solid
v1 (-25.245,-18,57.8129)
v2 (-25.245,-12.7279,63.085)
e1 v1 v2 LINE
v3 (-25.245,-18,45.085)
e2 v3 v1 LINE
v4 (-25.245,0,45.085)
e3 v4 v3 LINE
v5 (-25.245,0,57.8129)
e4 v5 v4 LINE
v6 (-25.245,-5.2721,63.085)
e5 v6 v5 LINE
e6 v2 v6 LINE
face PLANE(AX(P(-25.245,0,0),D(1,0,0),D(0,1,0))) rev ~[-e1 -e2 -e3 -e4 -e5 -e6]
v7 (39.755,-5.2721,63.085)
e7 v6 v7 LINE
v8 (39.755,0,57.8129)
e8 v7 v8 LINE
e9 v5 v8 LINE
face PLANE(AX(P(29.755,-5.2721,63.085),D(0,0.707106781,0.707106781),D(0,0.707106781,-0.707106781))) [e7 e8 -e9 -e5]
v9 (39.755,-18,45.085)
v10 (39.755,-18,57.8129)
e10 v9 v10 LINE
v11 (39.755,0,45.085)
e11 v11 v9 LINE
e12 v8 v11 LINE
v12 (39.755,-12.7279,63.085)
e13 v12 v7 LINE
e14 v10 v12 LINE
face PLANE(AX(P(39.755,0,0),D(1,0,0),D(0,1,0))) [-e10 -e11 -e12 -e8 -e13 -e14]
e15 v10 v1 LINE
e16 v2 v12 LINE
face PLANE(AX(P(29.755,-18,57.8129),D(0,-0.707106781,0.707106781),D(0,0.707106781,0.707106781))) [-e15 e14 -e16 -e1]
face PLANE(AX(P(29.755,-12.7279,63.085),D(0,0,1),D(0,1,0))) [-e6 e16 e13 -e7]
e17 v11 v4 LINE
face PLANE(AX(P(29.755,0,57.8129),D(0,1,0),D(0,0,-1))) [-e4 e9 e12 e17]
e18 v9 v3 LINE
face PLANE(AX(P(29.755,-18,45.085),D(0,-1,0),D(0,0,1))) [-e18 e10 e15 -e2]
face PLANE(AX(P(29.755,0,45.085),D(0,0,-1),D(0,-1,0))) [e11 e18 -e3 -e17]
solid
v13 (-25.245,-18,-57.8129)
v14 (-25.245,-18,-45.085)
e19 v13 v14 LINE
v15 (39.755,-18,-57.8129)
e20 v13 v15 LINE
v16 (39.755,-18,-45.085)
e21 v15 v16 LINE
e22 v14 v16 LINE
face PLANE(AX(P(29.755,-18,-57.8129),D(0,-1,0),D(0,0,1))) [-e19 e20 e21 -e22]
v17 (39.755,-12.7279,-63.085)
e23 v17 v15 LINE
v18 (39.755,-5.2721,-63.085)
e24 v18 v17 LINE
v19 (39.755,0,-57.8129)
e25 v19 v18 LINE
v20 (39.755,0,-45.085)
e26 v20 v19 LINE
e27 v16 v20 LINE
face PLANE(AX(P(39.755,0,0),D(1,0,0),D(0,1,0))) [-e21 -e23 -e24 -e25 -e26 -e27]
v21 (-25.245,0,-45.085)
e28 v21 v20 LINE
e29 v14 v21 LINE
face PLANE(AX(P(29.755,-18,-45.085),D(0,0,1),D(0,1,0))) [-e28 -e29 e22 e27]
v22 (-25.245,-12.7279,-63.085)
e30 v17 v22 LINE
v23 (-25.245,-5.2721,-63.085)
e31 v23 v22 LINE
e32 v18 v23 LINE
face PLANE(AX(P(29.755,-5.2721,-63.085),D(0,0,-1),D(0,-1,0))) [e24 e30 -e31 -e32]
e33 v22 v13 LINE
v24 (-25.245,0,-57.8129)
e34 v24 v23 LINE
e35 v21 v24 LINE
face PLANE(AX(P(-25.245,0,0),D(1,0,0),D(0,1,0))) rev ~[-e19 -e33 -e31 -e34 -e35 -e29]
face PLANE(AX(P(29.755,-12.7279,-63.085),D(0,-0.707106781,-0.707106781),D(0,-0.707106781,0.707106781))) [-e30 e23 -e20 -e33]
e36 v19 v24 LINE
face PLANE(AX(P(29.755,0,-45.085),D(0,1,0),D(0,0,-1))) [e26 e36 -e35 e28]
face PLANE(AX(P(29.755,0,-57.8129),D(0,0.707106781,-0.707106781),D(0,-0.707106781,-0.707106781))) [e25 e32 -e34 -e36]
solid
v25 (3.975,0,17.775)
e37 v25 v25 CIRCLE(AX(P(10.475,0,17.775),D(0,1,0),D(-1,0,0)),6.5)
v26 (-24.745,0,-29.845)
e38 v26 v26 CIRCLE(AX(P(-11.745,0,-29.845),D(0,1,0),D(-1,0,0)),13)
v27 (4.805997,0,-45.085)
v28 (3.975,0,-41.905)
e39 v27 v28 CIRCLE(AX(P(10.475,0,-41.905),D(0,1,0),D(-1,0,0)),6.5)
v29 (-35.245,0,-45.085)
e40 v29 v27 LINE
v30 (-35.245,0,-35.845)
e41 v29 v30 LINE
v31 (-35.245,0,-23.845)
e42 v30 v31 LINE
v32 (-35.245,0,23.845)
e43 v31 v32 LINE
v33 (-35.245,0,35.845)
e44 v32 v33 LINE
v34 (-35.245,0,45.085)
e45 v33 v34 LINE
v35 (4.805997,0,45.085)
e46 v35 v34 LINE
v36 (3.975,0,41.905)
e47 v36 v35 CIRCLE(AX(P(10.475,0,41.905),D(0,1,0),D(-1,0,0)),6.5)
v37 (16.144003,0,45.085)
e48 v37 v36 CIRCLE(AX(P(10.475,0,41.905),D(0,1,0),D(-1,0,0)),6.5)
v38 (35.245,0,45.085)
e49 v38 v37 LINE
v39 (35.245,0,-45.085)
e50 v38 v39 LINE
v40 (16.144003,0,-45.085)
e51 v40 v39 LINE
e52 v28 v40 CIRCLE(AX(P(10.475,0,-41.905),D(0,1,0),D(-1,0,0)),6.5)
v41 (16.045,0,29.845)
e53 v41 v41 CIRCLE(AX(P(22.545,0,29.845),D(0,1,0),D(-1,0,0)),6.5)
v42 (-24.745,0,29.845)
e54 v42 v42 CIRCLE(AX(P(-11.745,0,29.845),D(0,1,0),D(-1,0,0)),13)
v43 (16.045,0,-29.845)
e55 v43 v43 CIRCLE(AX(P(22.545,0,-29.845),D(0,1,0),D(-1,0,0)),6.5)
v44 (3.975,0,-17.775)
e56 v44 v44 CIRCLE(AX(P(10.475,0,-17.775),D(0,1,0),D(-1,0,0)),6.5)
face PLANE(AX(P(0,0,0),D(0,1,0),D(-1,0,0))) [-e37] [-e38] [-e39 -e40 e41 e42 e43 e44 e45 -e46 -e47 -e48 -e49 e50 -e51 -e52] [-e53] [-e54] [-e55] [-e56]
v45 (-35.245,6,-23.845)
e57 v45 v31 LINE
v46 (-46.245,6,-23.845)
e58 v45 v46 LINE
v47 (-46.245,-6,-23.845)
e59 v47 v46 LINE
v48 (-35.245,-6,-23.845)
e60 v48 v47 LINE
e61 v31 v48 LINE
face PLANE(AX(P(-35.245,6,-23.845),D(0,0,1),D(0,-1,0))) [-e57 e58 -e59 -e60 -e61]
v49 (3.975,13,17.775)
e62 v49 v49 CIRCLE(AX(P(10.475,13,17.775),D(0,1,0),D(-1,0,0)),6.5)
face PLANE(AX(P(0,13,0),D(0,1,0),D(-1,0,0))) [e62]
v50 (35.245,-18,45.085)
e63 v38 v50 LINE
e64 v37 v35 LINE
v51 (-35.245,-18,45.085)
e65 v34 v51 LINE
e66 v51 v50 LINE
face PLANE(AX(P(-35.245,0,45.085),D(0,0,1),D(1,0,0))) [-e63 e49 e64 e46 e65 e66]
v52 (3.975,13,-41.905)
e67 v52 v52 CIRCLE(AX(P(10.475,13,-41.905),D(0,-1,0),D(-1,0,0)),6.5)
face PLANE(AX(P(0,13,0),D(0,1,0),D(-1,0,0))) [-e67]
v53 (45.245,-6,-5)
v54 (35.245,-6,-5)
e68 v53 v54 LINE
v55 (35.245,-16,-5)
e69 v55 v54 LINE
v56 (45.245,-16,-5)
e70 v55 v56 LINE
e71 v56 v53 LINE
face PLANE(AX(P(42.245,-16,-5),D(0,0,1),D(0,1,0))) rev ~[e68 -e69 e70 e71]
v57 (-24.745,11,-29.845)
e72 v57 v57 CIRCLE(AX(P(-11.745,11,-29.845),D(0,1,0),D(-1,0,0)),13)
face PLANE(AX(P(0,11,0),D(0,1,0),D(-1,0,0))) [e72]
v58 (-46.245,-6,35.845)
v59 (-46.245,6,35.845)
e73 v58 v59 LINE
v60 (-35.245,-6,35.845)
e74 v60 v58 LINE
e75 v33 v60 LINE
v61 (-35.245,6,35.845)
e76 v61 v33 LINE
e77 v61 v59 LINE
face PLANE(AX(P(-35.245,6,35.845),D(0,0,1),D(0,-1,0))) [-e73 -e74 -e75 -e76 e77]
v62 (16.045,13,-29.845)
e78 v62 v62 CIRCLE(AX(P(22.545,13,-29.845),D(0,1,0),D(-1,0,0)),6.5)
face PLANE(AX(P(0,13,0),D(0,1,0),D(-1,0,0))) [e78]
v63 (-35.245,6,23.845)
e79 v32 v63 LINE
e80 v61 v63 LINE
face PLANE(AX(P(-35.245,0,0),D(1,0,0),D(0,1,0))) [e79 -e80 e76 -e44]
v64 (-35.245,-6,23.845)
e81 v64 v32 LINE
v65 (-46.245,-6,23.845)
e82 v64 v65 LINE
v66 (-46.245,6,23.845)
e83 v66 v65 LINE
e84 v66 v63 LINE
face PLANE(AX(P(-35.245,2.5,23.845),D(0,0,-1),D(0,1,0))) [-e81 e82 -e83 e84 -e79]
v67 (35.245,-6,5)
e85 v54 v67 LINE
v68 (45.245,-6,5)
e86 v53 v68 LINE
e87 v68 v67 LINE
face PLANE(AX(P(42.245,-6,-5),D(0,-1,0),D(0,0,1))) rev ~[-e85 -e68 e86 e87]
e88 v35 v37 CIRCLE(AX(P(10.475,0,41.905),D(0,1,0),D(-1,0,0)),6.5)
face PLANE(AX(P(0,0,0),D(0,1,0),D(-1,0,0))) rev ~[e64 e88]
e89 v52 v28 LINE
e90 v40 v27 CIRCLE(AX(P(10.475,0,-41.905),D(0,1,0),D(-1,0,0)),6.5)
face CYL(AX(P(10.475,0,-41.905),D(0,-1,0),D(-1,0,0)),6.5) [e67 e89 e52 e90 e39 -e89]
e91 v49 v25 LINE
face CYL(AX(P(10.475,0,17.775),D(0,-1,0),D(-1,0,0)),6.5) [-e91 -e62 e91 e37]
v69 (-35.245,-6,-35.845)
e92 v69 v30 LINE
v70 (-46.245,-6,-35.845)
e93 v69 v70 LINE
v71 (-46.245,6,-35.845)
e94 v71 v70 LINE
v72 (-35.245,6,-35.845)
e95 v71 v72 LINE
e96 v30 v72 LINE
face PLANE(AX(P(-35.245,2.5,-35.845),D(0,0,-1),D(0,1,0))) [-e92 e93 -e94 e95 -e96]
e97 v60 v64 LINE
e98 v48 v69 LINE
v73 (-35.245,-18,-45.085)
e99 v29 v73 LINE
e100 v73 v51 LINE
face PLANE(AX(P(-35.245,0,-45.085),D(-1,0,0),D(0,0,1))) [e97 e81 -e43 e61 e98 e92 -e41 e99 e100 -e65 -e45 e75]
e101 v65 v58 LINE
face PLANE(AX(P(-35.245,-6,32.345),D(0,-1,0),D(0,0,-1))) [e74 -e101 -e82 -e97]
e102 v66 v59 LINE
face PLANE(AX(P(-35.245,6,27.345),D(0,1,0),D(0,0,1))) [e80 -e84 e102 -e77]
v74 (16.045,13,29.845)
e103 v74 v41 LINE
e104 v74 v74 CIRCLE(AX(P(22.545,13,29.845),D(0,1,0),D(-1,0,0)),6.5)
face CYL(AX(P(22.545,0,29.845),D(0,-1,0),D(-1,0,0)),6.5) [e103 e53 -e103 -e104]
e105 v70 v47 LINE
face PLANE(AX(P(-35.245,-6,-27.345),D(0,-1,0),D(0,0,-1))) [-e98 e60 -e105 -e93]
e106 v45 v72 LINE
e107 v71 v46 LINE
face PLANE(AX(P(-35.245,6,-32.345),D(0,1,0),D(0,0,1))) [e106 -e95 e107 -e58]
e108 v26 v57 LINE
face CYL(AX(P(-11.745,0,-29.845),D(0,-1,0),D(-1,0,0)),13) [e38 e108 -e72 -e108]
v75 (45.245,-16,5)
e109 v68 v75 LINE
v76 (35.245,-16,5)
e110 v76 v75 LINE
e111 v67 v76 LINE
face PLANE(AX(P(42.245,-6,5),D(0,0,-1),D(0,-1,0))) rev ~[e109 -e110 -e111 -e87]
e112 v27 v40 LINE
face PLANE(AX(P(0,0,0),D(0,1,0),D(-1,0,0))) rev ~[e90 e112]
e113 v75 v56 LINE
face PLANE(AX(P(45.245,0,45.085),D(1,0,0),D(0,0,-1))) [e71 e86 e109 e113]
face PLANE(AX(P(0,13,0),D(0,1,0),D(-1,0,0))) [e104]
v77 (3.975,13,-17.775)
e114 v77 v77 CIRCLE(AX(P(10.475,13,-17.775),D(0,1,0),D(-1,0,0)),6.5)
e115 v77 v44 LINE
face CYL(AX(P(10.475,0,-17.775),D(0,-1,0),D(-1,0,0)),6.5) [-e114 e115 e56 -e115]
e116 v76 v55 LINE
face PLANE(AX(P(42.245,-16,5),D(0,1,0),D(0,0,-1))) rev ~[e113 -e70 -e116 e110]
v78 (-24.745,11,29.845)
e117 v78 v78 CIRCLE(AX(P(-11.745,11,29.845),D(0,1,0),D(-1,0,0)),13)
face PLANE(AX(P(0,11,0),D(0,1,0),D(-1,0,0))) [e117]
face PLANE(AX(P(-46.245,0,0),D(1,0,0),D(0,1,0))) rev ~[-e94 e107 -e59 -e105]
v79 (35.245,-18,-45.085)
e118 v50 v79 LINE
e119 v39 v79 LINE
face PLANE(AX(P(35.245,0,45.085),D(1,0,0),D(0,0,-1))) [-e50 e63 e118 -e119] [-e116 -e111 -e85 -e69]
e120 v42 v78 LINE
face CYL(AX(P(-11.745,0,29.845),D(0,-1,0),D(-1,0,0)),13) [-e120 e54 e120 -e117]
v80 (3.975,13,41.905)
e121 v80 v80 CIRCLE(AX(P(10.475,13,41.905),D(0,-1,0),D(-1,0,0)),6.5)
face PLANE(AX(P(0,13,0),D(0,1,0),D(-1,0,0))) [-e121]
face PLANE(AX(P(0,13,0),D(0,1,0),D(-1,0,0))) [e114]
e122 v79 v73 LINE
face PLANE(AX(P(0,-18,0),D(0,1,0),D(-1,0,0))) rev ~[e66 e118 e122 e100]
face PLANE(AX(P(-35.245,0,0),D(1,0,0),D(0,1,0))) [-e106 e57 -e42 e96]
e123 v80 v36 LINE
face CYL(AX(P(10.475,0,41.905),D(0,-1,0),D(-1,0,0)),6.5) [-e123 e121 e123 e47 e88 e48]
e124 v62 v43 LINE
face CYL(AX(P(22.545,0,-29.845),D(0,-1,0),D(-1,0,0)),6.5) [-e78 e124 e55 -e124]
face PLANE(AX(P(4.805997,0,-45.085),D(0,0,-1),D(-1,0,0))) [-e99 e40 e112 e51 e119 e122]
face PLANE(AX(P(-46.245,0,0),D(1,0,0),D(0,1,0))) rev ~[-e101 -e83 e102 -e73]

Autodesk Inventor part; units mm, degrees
ref_plane "XY Plane" through (0, 0, 0) normal (0, 0, 1) x (1, 0, 0)
sketch "Sketch1" plane through (0, 0, 0) normal (0, 1, 0) x (-1, 0, 0)
  line L0 (35.245, 45.085) -> (-35.245, 45.085)
  line L1 (-35.245, 45.085) -> (-35.245, -45.085)
  line L2 (-35.245, -45.085) -> (35.245, -45.085)
  line L3 (35.245, -45.085) -> (35.245, 45.085)
  circle A0 centre (11.745, 29.845) radius 13
  circle A1 centre (11.745, -29.845) radius 13
  line L4 (-10.475, 45.085) -> (-10.475, -45.085) construction
  circle A2 centre (-10.475, 41.905) radius 6.5
  circle A3 centre (-10.475, 17.775) radius 6.5
  circle A4 centre (-10.475, -17.775) radius 6.5
  circle A5 centre (-10.475, -41.905) radius 6.5
  circle A6 centre (-22.545, 29.845) radius 6.5
  circle A7 centre (-22.545, -29.845) radius 6.5
  point P0 (0, 0)
  dimension "d0" = 90.17
  dimension "d1" = 45.085
  dimension "d2" = 35.245
  dimension "d3" = 70.49
  dimension "d4" = 15.24
  dimension "d5" = 15.24
  dimension "d6" = 23.5
  dimension "d7" = 23.5
  dimension "d8" = 26
  dimension "d9" = 26
  dimension "d10" = 45.72
  dimension "d11" = 13
  dimension "d12" = 13
  dimension "d13" = 13
  dimension "d14" = 13
  dimension "d15" = 3.18
  dimension "d16" = 3.18
  dimension "d17" = 24.13
  dimension "d18" = 24.13
  dimension "d19" = 13
  dimension "d20" = 12.07
  dimension "d21" = 12.07
  dimension "d22" = 0
  dimension "d23" = 0
  dimension "d24" = 13
extrude "Extrusion1" add sketch "Sketch1" along normal blind 11 contours A0 | A1
sketch "Sketch2" plane through (0, 0, 0) normal (0, 1, 0) x (-1, 0, 0)
  line L0 (35.245, 45.085) -> (-35.245, 45.085)
  line L1 (-35.245, 45.085) -> (-35.245, -45.085)
  line L2 (-35.245, -45.085) -> (35.245, -45.085)
  line L3 (35.245, -45.085) -> (35.245, 45.085)
  circle A0 centre (11.745, 29.845) radius 13
  circle A1 centre (11.745, -29.845) radius 13
  line L4 (-10.475, 45.085) -> (-10.475, -45.085) construction
  circle A2 centre (-10.475, 41.905) radius 6.5
  circle A3 centre (-10.475, 17.775) radius 6.5
  circle A4 centre (-10.475, -17.775) radius 6.5
  circle A5 centre (-10.475, -41.905) radius 6.5
  circle A6 centre (-22.545, 29.845) radius 6.5
  circle A7 centre (-22.545, -29.845) radius 6.5
  point P0 (0, 0)
  dimension "d27" = 90.17
  dimension "d28" = 45.085
  dimension "d29" = 35.245
  dimension "d30" = 70.49
  dimension "d31" = 15.24
  dimension "d32" = 15.24
  dimension "d33" = 23.5
  dimension "d34" = 23.5
  dimension "d35" = 26
  dimension "d36" = 26
  dimension "d37" = 45.72
  dimension "d38" = 13
  dimension "d39" = 13
  dimension "d40" = 13
  dimension "d41" = 13
  dimension "d42" = 3.18
  dimension "d43" = 3.18
  dimension "d44" = 24.13
  dimension "d45" = 24.13
  dimension "d46" = 13
  dimension "d47" = 12.07
  dimension "d48" = 12.07
  dimension "d49" = 0
  dimension "d50" = 0
  dimension "d51" = 13
extrude "Extrusion2" add sketch "Sketch2" along normal blind 7 contours A2 L0 | L0 A2 | A5 L2 | L2 A5 | A3 | A4 | A6 | A7
ref_plane "Work Plane1" through (0, 7, 0) normal (0, 1, 0) x (-1, 0, 0)
sketch "Sketch3" plane through (0, 7, 0) normal (0, 1, 0) x (-1, 0, 0)
  line L0 (35.245, 45.085) -> (-35.245, 45.085)
  line L1 (-35.245, 45.085) -> (-35.245, -45.085)
  line L2 (-35.245, -45.085) -> (35.245, -45.085)
  line L3 (35.245, -45.085) -> (35.245, 45.085)
  circle A0 centre (11.745, 29.845) radius 13
  circle A1 centre (11.745, -29.845) radius 13
  line L4 (-10.475, 45.085) -> (-10.475, -45.085) construction
  circle A2 centre (-10.475, 41.905) radius 6.5
  circle A3 centre (-10.475, 17.775) radius 6.5
  circle A4 centre (-10.475, -17.775) radius 6.5
  circle A5 centre (-10.475, -41.905) radius 6.5
  circle A6 centre (-22.545, 29.845) radius 6.5
  circle A7 centre (-22.545, -29.845) radius 6.5
  point P0 (0, 0)
  dimension "d55" = 90.17
  dimension "d56" = 45.085
  dimension "d57" = 35.245
  dimension "d58" = 70.49
  dimension "d59" = 15.24
  dimension "d60" = 15.24
  dimension "d61" = 23.5
  dimension "d62" = 23.5
  dimension "d63" = 26
  dimension "d64" = 26
  dimension "d65" = 45.72
  dimension "d66" = 13
  dimension "d67" = 13
  dimension "d68" = 13
  dimension "d69" = 13
  dimension "d70" = 3.18
  dimension "d71" = 3.18
  dimension "d72" = 24.13
  dimension "d73" = 24.13
  dimension "d74" = 13
  dimension "d75" = 12.07
  dimension "d76" = 12.07
  dimension "d77" = 0
  dimension "d78" = 0
  dimension "d79" = 13
extrude "Extrusion3" add sketch "Sketch3" along normal blind 6 contours A2 L0 | L0 A2 | A5 L2 | L2 A5 | A3 | A4 | A6 | A7
sketch "Sketch4" plane through (0, 0, 0) normal (0, 1, 0) x (-1, 0, 0)
  line L0 (35.245, 45.085) -> (-35.245, 45.085)
  line L1 (-35.245, 45.085) -> (-35.245, -45.085)
  line L2 (-35.245, -45.085) -> (35.245, -45.085)
  line L3 (35.245, -45.085) -> (35.245, 45.085)
  circle A0 centre (11.745, 29.845) radius 13
  circle A1 centre (11.745, -29.845) radius 13
  line L4 (-10.475, 45.085) -> (-10.475, -45.085) construction
  circle A2 centre (-10.475, 41.905) radius 6.5
  circle A3 centre (-10.475, 17.775) radius 6.5
  circle A4 centre (-10.475, -17.775) radius 6.5
  circle A5 centre (-10.475, -41.905) radius 6.5
  circle A6 centre (-22.545, 29.845) radius 6.5
  circle A7 centre (-22.545, -29.845) radius 6.5
  point P0 (0, 0)
  dimension "d82" = 90.17
  dimension "d83" = 45.085
  dimension "d84" = 35.245
  dimension "d85" = 70.49
  dimension "d86" = 15.24
  dimension "d87" = 15.24
  dimension "d88" = 23.5
  dimension "d89" = 23.5
  dimension "d90" = 26
  dimension "d91" = 26
  dimension "d92" = 45.72
  dimension "d93" = 13
  dimension "d94" = 13
  dimension "d95" = 13
  dimension "d96" = 13
  dimension "d97" = 3.18
  dimension "d98" = 3.18
  dimension "d99" = 24.13
  dimension "d100" = 24.13
  dimension "d101" = 13
  dimension "d102" = 12.07
  dimension "d103" = 12.07
  dimension "d104" = 0
  dimension "d105" = 0
  dimension "d106" = 13
extrude "Extrusion4" add sketch "Sketch4" against normal blind 18 contours L3 L2 A5 L1 L0 A2 | A2 L0 | L2 A5 | A0 | A1 | A3 | A4 | A6 | A7 picked at (-10.0855, 41.5356) picked at (-10.2378, -41.8714)
ref_plane "Work Plane2" through (-35.245, 0, 0) normal (1, 0, 0) x (0, 1, 0)
sketch "Sketch6" plane through (-35.245, 0, 0) normal (1, 0, 0) x (0, 1, 0)
  circle A0 centre (0, -29.845) radius 6.5
  circle A1 centre (0, 29.845) radius 6.5
  line L0 (0, -45.085) -> (0, 45.085) projected
  line L1 (6, -23.845) -> (-6, -23.845)
  line L2 (-6, -23.845) -> (-6, -35.845)
  line L3 (-6, -35.845) -> (6, -35.845)
  line L4 (6, -35.845) -> (6, -23.845)
  line L5 (6, 35.845) -> (-6, 35.845)
  line L6 (-6, 35.845) -> (-6, 23.845)
  line L7 (-6, 23.845) -> (6, 23.845)
  line L8 (6, 23.845) -> (6, 35.845)
  point P0 (0, 0)
  dimension "d114" = 13
  dimension "d115" = 13
  dimension "d116" = 59.69
  dimension "d117" = 29.845
  dimension "d149" = 12
  dimension "d150" = 12
  dimension "d151" = 6
  dimension "d152" = 6
  dimension "d153" = 12
  dimension "d154" = 12
  dimension "d155" = 6
  dimension "d156" = 6
extrude "Extrusion5" add sketch "Sketch6" against normal blind 7 contours L4 A0 L3 L0 L1 | A0 L1 L4 | L4 L3 A0 | L0 L3 A0 L2 L1 | A0 L2 L1 | L3 L2 A0 | L8 A1 L7 L0 L5 | A1 L5 L8 | L8 L7 A1 | L0 L7 A1 L6 L5 | A1 L6 L5 | L7 L6 A1
ref_plane "Work Plane3" through (-42.245, 0, 0) normal (1, 0, 0) x (0, 1, 0)
sketch "Sketch8" plane through (-35.245, 0, 0) normal (1, 0, 0) x (0, 1, 0)
  circle A0 centre (-9, 54.085) radius 9
  circle A1 centre (-9, -54.085) radius 9
  line L0 (0, 45.085) -> (-18, 45.085) projected
  line L1 (0, -45.085) -> (-18, -45.085) projected
  line L2 (0, 63.085) -> (-18, 63.085)
  line L3 (-18, 63.085) -> (-18, 45.085)
  line L4 (-18, 45.085) -> (0, 45.085)
  line L5 (0, 45.085) -> (0, 63.085)
  line L6 (-5.2721, 63.085) -> (0, 57.8129)
  line L7 (-12.7279, 63.085) -> (-18, 57.8129)
  line L8 (0, -48.405) -> (0, -45.085) projected
  line L9 (-18, -63.085) -> (0, -63.085)
  line L10 (0, -63.085) -> (0, -45.085)
  line L11 (0, -45.085) -> (-18, -45.085)
  line L12 (-18, -45.085) -> (-18, -63.085)
  line L13 (-5.2721, -63.085) -> (0, -57.8129)
  line L14 (-12.7279, -63.085) -> (-18, -57.8129)
  point P0 (0, 0)
  point P1 (-18, 54.085)
  point P2 (-9, 45.085)
  point P3 (-2.636, 60.449)
  point P4 (-9, 63.085)
  point P5 (0, 54.085)
  point P6 (-15.364, 60.449)
  point P7 (-15.364, -60.449)
  point P8 (-18, -54.085)
  point P9 (-2.636, -60.449)
  point P10 (0, -54.085)
  point P11 (-9, -63.085)
  point P12 (-9, -45.085)
  dimension "d127" = 18
  dimension "d128" = 18
  dimension "d129" = 9
  dimension "d130" = 9
  dimension "d1540" = 45
  dimension "d1541" = 45
  dimension "d1542" = 45
  dimension "d1543" = 45
extrude "Extrusion7" add sketch "Sketch8" along normal blind 65 separate body contours A0 | L5 L0 A0 | A0 L6 L5 | A0 L2 L6 | L0 L3 A0 | A0 L7 L2 | L3 L7 A0 | A1 | L10 L13 A1 | A1 L1 L8 L10 | A1 L12 L1 | L13 L9 A1 | A1 L14 L12 | L9 L14 A1
sketch "Sketch9" plane through (0, 7, 0) normal (0, 1, 0) x (-1, 0, 0)
  line L0 (25.245, 13.5) -> (-1.755, 13.5)
  line L1 (-1.755, 13.5) -> (-1.755, -13.5)
  line L2 (-1.755, -13.5) -> (25.245, -13.5)
  line L3 (25.245, -13.5) -> (25.245, 13.5)
  circle A0 centre (11.745, 29.845) radius 13 projected
  circle A1 centre (11.745, 29.845) radius 13
  point P0 (0, 0)
  dimension "d133" = 27
  dimension "d134" = 27
  dimension "d135" = 13.5
  dimension "d136" = 13.5
sketch "Sketch10" plane through (35.245, 0, 45.085) normal (1, 0, 0) x (0, 0, -1)
  line L0 (40.085, -16) -> (50.085, -16)
  line L1 (50.085, -16) -> (50.085, -6)
  line L2 (50.085, -6) -> (40.085, -6)
  line L3 (40.085, -6) -> (40.085, -16)
  line L4 (0, 0) -> (90.17, 0) projected
  point P0 (45.085, 0)
  dimension "d137" = 10
  dimension "d138" = 10
  dimension "d140" = 5
  dimension "d171" = 6
extrude "Extrusion8" add sketch "Sketch10" along normal blind 7 bodies 1
sketch "Sketch11" plane through (42.245, 0, 45.085) normal (1, 0, 0) x (0, 0, -1)
  line L0 (40.085, -16) -> (50.085, -16)
  line L1 (50.085, -16) -> (50.085, -6)
  line L2 (50.085, -6) -> (40.085, -6)
  line L3 (40.085, -6) -> (40.085, -16)
  line L4 (0, 0) -> (90.17, 0) projected
  point P0 (45.085, 0)
  dimension "d143" = 10
  dimension "d144" = 10
  dimension "d146" = 5
  dimension "d172" = 6
extrude "Extrusion9" add sketch "Sketch11" along normal blind 3 bodies 1
sketch "Sketch12" plane through (-42.245, 0, 0) normal (1, 0, 0) x (0, 1, 0)
  circle A0 centre (0, -29.845) radius 6.5
  circle A1 centre (0, 29.845) radius 6.5
  line L0 (6, -23.845) -> (-6, -23.845)
  line L1 (-6, -23.845) -> (-6, -35.845)
  line L2 (-6, -35.845) -> (6, -35.845)
  line L3 (6, -35.845) -> (6, -23.845)
  line L4 (6, 35.845) -> (-6, 35.845)
  line L5 (-6, 35.845) -> (-6, 23.845)
  line L6 (-6, 23.845) -> (6, 23.845)
  line L7 (6, 23.845) -> (6, 35.845)
  point P0 (0, 0)
  dimension "d157" = 13
  dimension "d158" = 13
  dimension "d159" = 59.69
  dimension "d160" = 29.845
  dimension "d161" = 12
  dimension "d162" = 12
  dimension "d163" = 6
  dimension "d164" = 6
  dimension "d165" = 12
  dimension "d166" = 12
  dimension "d167" = 6
  dimension "d168" = 6
extrude "Extrusion10" add sketch "Sketch12" against normal blind 4 contours L3 A0 L2 L1 L0 | A0 L0 L3 | L3 L2 A0 | A0 L1 L0 | L2 L1 A0 | L7 A1 L6 L5 L4 | A1 L4 L7 | L7 L6 A1 | A1 L5 L4 | L6 L5 A1 bodies 1
move faces "Move20" translate (10, 0, 0) faces at (-35.245, -6, 53.5703)
move faces "Move21" translate (10, 0, 0) faces at (29.755, -6, 53.5703)
move faces "Move22" translate (10, 0, 0) faces at (29.755, -12, -53.5703)
move faces "Move23" translate (10, 0, 0) faces at (-35.245, -12, -53.5703)
properties part number "Obudowa_v1_srodek"
